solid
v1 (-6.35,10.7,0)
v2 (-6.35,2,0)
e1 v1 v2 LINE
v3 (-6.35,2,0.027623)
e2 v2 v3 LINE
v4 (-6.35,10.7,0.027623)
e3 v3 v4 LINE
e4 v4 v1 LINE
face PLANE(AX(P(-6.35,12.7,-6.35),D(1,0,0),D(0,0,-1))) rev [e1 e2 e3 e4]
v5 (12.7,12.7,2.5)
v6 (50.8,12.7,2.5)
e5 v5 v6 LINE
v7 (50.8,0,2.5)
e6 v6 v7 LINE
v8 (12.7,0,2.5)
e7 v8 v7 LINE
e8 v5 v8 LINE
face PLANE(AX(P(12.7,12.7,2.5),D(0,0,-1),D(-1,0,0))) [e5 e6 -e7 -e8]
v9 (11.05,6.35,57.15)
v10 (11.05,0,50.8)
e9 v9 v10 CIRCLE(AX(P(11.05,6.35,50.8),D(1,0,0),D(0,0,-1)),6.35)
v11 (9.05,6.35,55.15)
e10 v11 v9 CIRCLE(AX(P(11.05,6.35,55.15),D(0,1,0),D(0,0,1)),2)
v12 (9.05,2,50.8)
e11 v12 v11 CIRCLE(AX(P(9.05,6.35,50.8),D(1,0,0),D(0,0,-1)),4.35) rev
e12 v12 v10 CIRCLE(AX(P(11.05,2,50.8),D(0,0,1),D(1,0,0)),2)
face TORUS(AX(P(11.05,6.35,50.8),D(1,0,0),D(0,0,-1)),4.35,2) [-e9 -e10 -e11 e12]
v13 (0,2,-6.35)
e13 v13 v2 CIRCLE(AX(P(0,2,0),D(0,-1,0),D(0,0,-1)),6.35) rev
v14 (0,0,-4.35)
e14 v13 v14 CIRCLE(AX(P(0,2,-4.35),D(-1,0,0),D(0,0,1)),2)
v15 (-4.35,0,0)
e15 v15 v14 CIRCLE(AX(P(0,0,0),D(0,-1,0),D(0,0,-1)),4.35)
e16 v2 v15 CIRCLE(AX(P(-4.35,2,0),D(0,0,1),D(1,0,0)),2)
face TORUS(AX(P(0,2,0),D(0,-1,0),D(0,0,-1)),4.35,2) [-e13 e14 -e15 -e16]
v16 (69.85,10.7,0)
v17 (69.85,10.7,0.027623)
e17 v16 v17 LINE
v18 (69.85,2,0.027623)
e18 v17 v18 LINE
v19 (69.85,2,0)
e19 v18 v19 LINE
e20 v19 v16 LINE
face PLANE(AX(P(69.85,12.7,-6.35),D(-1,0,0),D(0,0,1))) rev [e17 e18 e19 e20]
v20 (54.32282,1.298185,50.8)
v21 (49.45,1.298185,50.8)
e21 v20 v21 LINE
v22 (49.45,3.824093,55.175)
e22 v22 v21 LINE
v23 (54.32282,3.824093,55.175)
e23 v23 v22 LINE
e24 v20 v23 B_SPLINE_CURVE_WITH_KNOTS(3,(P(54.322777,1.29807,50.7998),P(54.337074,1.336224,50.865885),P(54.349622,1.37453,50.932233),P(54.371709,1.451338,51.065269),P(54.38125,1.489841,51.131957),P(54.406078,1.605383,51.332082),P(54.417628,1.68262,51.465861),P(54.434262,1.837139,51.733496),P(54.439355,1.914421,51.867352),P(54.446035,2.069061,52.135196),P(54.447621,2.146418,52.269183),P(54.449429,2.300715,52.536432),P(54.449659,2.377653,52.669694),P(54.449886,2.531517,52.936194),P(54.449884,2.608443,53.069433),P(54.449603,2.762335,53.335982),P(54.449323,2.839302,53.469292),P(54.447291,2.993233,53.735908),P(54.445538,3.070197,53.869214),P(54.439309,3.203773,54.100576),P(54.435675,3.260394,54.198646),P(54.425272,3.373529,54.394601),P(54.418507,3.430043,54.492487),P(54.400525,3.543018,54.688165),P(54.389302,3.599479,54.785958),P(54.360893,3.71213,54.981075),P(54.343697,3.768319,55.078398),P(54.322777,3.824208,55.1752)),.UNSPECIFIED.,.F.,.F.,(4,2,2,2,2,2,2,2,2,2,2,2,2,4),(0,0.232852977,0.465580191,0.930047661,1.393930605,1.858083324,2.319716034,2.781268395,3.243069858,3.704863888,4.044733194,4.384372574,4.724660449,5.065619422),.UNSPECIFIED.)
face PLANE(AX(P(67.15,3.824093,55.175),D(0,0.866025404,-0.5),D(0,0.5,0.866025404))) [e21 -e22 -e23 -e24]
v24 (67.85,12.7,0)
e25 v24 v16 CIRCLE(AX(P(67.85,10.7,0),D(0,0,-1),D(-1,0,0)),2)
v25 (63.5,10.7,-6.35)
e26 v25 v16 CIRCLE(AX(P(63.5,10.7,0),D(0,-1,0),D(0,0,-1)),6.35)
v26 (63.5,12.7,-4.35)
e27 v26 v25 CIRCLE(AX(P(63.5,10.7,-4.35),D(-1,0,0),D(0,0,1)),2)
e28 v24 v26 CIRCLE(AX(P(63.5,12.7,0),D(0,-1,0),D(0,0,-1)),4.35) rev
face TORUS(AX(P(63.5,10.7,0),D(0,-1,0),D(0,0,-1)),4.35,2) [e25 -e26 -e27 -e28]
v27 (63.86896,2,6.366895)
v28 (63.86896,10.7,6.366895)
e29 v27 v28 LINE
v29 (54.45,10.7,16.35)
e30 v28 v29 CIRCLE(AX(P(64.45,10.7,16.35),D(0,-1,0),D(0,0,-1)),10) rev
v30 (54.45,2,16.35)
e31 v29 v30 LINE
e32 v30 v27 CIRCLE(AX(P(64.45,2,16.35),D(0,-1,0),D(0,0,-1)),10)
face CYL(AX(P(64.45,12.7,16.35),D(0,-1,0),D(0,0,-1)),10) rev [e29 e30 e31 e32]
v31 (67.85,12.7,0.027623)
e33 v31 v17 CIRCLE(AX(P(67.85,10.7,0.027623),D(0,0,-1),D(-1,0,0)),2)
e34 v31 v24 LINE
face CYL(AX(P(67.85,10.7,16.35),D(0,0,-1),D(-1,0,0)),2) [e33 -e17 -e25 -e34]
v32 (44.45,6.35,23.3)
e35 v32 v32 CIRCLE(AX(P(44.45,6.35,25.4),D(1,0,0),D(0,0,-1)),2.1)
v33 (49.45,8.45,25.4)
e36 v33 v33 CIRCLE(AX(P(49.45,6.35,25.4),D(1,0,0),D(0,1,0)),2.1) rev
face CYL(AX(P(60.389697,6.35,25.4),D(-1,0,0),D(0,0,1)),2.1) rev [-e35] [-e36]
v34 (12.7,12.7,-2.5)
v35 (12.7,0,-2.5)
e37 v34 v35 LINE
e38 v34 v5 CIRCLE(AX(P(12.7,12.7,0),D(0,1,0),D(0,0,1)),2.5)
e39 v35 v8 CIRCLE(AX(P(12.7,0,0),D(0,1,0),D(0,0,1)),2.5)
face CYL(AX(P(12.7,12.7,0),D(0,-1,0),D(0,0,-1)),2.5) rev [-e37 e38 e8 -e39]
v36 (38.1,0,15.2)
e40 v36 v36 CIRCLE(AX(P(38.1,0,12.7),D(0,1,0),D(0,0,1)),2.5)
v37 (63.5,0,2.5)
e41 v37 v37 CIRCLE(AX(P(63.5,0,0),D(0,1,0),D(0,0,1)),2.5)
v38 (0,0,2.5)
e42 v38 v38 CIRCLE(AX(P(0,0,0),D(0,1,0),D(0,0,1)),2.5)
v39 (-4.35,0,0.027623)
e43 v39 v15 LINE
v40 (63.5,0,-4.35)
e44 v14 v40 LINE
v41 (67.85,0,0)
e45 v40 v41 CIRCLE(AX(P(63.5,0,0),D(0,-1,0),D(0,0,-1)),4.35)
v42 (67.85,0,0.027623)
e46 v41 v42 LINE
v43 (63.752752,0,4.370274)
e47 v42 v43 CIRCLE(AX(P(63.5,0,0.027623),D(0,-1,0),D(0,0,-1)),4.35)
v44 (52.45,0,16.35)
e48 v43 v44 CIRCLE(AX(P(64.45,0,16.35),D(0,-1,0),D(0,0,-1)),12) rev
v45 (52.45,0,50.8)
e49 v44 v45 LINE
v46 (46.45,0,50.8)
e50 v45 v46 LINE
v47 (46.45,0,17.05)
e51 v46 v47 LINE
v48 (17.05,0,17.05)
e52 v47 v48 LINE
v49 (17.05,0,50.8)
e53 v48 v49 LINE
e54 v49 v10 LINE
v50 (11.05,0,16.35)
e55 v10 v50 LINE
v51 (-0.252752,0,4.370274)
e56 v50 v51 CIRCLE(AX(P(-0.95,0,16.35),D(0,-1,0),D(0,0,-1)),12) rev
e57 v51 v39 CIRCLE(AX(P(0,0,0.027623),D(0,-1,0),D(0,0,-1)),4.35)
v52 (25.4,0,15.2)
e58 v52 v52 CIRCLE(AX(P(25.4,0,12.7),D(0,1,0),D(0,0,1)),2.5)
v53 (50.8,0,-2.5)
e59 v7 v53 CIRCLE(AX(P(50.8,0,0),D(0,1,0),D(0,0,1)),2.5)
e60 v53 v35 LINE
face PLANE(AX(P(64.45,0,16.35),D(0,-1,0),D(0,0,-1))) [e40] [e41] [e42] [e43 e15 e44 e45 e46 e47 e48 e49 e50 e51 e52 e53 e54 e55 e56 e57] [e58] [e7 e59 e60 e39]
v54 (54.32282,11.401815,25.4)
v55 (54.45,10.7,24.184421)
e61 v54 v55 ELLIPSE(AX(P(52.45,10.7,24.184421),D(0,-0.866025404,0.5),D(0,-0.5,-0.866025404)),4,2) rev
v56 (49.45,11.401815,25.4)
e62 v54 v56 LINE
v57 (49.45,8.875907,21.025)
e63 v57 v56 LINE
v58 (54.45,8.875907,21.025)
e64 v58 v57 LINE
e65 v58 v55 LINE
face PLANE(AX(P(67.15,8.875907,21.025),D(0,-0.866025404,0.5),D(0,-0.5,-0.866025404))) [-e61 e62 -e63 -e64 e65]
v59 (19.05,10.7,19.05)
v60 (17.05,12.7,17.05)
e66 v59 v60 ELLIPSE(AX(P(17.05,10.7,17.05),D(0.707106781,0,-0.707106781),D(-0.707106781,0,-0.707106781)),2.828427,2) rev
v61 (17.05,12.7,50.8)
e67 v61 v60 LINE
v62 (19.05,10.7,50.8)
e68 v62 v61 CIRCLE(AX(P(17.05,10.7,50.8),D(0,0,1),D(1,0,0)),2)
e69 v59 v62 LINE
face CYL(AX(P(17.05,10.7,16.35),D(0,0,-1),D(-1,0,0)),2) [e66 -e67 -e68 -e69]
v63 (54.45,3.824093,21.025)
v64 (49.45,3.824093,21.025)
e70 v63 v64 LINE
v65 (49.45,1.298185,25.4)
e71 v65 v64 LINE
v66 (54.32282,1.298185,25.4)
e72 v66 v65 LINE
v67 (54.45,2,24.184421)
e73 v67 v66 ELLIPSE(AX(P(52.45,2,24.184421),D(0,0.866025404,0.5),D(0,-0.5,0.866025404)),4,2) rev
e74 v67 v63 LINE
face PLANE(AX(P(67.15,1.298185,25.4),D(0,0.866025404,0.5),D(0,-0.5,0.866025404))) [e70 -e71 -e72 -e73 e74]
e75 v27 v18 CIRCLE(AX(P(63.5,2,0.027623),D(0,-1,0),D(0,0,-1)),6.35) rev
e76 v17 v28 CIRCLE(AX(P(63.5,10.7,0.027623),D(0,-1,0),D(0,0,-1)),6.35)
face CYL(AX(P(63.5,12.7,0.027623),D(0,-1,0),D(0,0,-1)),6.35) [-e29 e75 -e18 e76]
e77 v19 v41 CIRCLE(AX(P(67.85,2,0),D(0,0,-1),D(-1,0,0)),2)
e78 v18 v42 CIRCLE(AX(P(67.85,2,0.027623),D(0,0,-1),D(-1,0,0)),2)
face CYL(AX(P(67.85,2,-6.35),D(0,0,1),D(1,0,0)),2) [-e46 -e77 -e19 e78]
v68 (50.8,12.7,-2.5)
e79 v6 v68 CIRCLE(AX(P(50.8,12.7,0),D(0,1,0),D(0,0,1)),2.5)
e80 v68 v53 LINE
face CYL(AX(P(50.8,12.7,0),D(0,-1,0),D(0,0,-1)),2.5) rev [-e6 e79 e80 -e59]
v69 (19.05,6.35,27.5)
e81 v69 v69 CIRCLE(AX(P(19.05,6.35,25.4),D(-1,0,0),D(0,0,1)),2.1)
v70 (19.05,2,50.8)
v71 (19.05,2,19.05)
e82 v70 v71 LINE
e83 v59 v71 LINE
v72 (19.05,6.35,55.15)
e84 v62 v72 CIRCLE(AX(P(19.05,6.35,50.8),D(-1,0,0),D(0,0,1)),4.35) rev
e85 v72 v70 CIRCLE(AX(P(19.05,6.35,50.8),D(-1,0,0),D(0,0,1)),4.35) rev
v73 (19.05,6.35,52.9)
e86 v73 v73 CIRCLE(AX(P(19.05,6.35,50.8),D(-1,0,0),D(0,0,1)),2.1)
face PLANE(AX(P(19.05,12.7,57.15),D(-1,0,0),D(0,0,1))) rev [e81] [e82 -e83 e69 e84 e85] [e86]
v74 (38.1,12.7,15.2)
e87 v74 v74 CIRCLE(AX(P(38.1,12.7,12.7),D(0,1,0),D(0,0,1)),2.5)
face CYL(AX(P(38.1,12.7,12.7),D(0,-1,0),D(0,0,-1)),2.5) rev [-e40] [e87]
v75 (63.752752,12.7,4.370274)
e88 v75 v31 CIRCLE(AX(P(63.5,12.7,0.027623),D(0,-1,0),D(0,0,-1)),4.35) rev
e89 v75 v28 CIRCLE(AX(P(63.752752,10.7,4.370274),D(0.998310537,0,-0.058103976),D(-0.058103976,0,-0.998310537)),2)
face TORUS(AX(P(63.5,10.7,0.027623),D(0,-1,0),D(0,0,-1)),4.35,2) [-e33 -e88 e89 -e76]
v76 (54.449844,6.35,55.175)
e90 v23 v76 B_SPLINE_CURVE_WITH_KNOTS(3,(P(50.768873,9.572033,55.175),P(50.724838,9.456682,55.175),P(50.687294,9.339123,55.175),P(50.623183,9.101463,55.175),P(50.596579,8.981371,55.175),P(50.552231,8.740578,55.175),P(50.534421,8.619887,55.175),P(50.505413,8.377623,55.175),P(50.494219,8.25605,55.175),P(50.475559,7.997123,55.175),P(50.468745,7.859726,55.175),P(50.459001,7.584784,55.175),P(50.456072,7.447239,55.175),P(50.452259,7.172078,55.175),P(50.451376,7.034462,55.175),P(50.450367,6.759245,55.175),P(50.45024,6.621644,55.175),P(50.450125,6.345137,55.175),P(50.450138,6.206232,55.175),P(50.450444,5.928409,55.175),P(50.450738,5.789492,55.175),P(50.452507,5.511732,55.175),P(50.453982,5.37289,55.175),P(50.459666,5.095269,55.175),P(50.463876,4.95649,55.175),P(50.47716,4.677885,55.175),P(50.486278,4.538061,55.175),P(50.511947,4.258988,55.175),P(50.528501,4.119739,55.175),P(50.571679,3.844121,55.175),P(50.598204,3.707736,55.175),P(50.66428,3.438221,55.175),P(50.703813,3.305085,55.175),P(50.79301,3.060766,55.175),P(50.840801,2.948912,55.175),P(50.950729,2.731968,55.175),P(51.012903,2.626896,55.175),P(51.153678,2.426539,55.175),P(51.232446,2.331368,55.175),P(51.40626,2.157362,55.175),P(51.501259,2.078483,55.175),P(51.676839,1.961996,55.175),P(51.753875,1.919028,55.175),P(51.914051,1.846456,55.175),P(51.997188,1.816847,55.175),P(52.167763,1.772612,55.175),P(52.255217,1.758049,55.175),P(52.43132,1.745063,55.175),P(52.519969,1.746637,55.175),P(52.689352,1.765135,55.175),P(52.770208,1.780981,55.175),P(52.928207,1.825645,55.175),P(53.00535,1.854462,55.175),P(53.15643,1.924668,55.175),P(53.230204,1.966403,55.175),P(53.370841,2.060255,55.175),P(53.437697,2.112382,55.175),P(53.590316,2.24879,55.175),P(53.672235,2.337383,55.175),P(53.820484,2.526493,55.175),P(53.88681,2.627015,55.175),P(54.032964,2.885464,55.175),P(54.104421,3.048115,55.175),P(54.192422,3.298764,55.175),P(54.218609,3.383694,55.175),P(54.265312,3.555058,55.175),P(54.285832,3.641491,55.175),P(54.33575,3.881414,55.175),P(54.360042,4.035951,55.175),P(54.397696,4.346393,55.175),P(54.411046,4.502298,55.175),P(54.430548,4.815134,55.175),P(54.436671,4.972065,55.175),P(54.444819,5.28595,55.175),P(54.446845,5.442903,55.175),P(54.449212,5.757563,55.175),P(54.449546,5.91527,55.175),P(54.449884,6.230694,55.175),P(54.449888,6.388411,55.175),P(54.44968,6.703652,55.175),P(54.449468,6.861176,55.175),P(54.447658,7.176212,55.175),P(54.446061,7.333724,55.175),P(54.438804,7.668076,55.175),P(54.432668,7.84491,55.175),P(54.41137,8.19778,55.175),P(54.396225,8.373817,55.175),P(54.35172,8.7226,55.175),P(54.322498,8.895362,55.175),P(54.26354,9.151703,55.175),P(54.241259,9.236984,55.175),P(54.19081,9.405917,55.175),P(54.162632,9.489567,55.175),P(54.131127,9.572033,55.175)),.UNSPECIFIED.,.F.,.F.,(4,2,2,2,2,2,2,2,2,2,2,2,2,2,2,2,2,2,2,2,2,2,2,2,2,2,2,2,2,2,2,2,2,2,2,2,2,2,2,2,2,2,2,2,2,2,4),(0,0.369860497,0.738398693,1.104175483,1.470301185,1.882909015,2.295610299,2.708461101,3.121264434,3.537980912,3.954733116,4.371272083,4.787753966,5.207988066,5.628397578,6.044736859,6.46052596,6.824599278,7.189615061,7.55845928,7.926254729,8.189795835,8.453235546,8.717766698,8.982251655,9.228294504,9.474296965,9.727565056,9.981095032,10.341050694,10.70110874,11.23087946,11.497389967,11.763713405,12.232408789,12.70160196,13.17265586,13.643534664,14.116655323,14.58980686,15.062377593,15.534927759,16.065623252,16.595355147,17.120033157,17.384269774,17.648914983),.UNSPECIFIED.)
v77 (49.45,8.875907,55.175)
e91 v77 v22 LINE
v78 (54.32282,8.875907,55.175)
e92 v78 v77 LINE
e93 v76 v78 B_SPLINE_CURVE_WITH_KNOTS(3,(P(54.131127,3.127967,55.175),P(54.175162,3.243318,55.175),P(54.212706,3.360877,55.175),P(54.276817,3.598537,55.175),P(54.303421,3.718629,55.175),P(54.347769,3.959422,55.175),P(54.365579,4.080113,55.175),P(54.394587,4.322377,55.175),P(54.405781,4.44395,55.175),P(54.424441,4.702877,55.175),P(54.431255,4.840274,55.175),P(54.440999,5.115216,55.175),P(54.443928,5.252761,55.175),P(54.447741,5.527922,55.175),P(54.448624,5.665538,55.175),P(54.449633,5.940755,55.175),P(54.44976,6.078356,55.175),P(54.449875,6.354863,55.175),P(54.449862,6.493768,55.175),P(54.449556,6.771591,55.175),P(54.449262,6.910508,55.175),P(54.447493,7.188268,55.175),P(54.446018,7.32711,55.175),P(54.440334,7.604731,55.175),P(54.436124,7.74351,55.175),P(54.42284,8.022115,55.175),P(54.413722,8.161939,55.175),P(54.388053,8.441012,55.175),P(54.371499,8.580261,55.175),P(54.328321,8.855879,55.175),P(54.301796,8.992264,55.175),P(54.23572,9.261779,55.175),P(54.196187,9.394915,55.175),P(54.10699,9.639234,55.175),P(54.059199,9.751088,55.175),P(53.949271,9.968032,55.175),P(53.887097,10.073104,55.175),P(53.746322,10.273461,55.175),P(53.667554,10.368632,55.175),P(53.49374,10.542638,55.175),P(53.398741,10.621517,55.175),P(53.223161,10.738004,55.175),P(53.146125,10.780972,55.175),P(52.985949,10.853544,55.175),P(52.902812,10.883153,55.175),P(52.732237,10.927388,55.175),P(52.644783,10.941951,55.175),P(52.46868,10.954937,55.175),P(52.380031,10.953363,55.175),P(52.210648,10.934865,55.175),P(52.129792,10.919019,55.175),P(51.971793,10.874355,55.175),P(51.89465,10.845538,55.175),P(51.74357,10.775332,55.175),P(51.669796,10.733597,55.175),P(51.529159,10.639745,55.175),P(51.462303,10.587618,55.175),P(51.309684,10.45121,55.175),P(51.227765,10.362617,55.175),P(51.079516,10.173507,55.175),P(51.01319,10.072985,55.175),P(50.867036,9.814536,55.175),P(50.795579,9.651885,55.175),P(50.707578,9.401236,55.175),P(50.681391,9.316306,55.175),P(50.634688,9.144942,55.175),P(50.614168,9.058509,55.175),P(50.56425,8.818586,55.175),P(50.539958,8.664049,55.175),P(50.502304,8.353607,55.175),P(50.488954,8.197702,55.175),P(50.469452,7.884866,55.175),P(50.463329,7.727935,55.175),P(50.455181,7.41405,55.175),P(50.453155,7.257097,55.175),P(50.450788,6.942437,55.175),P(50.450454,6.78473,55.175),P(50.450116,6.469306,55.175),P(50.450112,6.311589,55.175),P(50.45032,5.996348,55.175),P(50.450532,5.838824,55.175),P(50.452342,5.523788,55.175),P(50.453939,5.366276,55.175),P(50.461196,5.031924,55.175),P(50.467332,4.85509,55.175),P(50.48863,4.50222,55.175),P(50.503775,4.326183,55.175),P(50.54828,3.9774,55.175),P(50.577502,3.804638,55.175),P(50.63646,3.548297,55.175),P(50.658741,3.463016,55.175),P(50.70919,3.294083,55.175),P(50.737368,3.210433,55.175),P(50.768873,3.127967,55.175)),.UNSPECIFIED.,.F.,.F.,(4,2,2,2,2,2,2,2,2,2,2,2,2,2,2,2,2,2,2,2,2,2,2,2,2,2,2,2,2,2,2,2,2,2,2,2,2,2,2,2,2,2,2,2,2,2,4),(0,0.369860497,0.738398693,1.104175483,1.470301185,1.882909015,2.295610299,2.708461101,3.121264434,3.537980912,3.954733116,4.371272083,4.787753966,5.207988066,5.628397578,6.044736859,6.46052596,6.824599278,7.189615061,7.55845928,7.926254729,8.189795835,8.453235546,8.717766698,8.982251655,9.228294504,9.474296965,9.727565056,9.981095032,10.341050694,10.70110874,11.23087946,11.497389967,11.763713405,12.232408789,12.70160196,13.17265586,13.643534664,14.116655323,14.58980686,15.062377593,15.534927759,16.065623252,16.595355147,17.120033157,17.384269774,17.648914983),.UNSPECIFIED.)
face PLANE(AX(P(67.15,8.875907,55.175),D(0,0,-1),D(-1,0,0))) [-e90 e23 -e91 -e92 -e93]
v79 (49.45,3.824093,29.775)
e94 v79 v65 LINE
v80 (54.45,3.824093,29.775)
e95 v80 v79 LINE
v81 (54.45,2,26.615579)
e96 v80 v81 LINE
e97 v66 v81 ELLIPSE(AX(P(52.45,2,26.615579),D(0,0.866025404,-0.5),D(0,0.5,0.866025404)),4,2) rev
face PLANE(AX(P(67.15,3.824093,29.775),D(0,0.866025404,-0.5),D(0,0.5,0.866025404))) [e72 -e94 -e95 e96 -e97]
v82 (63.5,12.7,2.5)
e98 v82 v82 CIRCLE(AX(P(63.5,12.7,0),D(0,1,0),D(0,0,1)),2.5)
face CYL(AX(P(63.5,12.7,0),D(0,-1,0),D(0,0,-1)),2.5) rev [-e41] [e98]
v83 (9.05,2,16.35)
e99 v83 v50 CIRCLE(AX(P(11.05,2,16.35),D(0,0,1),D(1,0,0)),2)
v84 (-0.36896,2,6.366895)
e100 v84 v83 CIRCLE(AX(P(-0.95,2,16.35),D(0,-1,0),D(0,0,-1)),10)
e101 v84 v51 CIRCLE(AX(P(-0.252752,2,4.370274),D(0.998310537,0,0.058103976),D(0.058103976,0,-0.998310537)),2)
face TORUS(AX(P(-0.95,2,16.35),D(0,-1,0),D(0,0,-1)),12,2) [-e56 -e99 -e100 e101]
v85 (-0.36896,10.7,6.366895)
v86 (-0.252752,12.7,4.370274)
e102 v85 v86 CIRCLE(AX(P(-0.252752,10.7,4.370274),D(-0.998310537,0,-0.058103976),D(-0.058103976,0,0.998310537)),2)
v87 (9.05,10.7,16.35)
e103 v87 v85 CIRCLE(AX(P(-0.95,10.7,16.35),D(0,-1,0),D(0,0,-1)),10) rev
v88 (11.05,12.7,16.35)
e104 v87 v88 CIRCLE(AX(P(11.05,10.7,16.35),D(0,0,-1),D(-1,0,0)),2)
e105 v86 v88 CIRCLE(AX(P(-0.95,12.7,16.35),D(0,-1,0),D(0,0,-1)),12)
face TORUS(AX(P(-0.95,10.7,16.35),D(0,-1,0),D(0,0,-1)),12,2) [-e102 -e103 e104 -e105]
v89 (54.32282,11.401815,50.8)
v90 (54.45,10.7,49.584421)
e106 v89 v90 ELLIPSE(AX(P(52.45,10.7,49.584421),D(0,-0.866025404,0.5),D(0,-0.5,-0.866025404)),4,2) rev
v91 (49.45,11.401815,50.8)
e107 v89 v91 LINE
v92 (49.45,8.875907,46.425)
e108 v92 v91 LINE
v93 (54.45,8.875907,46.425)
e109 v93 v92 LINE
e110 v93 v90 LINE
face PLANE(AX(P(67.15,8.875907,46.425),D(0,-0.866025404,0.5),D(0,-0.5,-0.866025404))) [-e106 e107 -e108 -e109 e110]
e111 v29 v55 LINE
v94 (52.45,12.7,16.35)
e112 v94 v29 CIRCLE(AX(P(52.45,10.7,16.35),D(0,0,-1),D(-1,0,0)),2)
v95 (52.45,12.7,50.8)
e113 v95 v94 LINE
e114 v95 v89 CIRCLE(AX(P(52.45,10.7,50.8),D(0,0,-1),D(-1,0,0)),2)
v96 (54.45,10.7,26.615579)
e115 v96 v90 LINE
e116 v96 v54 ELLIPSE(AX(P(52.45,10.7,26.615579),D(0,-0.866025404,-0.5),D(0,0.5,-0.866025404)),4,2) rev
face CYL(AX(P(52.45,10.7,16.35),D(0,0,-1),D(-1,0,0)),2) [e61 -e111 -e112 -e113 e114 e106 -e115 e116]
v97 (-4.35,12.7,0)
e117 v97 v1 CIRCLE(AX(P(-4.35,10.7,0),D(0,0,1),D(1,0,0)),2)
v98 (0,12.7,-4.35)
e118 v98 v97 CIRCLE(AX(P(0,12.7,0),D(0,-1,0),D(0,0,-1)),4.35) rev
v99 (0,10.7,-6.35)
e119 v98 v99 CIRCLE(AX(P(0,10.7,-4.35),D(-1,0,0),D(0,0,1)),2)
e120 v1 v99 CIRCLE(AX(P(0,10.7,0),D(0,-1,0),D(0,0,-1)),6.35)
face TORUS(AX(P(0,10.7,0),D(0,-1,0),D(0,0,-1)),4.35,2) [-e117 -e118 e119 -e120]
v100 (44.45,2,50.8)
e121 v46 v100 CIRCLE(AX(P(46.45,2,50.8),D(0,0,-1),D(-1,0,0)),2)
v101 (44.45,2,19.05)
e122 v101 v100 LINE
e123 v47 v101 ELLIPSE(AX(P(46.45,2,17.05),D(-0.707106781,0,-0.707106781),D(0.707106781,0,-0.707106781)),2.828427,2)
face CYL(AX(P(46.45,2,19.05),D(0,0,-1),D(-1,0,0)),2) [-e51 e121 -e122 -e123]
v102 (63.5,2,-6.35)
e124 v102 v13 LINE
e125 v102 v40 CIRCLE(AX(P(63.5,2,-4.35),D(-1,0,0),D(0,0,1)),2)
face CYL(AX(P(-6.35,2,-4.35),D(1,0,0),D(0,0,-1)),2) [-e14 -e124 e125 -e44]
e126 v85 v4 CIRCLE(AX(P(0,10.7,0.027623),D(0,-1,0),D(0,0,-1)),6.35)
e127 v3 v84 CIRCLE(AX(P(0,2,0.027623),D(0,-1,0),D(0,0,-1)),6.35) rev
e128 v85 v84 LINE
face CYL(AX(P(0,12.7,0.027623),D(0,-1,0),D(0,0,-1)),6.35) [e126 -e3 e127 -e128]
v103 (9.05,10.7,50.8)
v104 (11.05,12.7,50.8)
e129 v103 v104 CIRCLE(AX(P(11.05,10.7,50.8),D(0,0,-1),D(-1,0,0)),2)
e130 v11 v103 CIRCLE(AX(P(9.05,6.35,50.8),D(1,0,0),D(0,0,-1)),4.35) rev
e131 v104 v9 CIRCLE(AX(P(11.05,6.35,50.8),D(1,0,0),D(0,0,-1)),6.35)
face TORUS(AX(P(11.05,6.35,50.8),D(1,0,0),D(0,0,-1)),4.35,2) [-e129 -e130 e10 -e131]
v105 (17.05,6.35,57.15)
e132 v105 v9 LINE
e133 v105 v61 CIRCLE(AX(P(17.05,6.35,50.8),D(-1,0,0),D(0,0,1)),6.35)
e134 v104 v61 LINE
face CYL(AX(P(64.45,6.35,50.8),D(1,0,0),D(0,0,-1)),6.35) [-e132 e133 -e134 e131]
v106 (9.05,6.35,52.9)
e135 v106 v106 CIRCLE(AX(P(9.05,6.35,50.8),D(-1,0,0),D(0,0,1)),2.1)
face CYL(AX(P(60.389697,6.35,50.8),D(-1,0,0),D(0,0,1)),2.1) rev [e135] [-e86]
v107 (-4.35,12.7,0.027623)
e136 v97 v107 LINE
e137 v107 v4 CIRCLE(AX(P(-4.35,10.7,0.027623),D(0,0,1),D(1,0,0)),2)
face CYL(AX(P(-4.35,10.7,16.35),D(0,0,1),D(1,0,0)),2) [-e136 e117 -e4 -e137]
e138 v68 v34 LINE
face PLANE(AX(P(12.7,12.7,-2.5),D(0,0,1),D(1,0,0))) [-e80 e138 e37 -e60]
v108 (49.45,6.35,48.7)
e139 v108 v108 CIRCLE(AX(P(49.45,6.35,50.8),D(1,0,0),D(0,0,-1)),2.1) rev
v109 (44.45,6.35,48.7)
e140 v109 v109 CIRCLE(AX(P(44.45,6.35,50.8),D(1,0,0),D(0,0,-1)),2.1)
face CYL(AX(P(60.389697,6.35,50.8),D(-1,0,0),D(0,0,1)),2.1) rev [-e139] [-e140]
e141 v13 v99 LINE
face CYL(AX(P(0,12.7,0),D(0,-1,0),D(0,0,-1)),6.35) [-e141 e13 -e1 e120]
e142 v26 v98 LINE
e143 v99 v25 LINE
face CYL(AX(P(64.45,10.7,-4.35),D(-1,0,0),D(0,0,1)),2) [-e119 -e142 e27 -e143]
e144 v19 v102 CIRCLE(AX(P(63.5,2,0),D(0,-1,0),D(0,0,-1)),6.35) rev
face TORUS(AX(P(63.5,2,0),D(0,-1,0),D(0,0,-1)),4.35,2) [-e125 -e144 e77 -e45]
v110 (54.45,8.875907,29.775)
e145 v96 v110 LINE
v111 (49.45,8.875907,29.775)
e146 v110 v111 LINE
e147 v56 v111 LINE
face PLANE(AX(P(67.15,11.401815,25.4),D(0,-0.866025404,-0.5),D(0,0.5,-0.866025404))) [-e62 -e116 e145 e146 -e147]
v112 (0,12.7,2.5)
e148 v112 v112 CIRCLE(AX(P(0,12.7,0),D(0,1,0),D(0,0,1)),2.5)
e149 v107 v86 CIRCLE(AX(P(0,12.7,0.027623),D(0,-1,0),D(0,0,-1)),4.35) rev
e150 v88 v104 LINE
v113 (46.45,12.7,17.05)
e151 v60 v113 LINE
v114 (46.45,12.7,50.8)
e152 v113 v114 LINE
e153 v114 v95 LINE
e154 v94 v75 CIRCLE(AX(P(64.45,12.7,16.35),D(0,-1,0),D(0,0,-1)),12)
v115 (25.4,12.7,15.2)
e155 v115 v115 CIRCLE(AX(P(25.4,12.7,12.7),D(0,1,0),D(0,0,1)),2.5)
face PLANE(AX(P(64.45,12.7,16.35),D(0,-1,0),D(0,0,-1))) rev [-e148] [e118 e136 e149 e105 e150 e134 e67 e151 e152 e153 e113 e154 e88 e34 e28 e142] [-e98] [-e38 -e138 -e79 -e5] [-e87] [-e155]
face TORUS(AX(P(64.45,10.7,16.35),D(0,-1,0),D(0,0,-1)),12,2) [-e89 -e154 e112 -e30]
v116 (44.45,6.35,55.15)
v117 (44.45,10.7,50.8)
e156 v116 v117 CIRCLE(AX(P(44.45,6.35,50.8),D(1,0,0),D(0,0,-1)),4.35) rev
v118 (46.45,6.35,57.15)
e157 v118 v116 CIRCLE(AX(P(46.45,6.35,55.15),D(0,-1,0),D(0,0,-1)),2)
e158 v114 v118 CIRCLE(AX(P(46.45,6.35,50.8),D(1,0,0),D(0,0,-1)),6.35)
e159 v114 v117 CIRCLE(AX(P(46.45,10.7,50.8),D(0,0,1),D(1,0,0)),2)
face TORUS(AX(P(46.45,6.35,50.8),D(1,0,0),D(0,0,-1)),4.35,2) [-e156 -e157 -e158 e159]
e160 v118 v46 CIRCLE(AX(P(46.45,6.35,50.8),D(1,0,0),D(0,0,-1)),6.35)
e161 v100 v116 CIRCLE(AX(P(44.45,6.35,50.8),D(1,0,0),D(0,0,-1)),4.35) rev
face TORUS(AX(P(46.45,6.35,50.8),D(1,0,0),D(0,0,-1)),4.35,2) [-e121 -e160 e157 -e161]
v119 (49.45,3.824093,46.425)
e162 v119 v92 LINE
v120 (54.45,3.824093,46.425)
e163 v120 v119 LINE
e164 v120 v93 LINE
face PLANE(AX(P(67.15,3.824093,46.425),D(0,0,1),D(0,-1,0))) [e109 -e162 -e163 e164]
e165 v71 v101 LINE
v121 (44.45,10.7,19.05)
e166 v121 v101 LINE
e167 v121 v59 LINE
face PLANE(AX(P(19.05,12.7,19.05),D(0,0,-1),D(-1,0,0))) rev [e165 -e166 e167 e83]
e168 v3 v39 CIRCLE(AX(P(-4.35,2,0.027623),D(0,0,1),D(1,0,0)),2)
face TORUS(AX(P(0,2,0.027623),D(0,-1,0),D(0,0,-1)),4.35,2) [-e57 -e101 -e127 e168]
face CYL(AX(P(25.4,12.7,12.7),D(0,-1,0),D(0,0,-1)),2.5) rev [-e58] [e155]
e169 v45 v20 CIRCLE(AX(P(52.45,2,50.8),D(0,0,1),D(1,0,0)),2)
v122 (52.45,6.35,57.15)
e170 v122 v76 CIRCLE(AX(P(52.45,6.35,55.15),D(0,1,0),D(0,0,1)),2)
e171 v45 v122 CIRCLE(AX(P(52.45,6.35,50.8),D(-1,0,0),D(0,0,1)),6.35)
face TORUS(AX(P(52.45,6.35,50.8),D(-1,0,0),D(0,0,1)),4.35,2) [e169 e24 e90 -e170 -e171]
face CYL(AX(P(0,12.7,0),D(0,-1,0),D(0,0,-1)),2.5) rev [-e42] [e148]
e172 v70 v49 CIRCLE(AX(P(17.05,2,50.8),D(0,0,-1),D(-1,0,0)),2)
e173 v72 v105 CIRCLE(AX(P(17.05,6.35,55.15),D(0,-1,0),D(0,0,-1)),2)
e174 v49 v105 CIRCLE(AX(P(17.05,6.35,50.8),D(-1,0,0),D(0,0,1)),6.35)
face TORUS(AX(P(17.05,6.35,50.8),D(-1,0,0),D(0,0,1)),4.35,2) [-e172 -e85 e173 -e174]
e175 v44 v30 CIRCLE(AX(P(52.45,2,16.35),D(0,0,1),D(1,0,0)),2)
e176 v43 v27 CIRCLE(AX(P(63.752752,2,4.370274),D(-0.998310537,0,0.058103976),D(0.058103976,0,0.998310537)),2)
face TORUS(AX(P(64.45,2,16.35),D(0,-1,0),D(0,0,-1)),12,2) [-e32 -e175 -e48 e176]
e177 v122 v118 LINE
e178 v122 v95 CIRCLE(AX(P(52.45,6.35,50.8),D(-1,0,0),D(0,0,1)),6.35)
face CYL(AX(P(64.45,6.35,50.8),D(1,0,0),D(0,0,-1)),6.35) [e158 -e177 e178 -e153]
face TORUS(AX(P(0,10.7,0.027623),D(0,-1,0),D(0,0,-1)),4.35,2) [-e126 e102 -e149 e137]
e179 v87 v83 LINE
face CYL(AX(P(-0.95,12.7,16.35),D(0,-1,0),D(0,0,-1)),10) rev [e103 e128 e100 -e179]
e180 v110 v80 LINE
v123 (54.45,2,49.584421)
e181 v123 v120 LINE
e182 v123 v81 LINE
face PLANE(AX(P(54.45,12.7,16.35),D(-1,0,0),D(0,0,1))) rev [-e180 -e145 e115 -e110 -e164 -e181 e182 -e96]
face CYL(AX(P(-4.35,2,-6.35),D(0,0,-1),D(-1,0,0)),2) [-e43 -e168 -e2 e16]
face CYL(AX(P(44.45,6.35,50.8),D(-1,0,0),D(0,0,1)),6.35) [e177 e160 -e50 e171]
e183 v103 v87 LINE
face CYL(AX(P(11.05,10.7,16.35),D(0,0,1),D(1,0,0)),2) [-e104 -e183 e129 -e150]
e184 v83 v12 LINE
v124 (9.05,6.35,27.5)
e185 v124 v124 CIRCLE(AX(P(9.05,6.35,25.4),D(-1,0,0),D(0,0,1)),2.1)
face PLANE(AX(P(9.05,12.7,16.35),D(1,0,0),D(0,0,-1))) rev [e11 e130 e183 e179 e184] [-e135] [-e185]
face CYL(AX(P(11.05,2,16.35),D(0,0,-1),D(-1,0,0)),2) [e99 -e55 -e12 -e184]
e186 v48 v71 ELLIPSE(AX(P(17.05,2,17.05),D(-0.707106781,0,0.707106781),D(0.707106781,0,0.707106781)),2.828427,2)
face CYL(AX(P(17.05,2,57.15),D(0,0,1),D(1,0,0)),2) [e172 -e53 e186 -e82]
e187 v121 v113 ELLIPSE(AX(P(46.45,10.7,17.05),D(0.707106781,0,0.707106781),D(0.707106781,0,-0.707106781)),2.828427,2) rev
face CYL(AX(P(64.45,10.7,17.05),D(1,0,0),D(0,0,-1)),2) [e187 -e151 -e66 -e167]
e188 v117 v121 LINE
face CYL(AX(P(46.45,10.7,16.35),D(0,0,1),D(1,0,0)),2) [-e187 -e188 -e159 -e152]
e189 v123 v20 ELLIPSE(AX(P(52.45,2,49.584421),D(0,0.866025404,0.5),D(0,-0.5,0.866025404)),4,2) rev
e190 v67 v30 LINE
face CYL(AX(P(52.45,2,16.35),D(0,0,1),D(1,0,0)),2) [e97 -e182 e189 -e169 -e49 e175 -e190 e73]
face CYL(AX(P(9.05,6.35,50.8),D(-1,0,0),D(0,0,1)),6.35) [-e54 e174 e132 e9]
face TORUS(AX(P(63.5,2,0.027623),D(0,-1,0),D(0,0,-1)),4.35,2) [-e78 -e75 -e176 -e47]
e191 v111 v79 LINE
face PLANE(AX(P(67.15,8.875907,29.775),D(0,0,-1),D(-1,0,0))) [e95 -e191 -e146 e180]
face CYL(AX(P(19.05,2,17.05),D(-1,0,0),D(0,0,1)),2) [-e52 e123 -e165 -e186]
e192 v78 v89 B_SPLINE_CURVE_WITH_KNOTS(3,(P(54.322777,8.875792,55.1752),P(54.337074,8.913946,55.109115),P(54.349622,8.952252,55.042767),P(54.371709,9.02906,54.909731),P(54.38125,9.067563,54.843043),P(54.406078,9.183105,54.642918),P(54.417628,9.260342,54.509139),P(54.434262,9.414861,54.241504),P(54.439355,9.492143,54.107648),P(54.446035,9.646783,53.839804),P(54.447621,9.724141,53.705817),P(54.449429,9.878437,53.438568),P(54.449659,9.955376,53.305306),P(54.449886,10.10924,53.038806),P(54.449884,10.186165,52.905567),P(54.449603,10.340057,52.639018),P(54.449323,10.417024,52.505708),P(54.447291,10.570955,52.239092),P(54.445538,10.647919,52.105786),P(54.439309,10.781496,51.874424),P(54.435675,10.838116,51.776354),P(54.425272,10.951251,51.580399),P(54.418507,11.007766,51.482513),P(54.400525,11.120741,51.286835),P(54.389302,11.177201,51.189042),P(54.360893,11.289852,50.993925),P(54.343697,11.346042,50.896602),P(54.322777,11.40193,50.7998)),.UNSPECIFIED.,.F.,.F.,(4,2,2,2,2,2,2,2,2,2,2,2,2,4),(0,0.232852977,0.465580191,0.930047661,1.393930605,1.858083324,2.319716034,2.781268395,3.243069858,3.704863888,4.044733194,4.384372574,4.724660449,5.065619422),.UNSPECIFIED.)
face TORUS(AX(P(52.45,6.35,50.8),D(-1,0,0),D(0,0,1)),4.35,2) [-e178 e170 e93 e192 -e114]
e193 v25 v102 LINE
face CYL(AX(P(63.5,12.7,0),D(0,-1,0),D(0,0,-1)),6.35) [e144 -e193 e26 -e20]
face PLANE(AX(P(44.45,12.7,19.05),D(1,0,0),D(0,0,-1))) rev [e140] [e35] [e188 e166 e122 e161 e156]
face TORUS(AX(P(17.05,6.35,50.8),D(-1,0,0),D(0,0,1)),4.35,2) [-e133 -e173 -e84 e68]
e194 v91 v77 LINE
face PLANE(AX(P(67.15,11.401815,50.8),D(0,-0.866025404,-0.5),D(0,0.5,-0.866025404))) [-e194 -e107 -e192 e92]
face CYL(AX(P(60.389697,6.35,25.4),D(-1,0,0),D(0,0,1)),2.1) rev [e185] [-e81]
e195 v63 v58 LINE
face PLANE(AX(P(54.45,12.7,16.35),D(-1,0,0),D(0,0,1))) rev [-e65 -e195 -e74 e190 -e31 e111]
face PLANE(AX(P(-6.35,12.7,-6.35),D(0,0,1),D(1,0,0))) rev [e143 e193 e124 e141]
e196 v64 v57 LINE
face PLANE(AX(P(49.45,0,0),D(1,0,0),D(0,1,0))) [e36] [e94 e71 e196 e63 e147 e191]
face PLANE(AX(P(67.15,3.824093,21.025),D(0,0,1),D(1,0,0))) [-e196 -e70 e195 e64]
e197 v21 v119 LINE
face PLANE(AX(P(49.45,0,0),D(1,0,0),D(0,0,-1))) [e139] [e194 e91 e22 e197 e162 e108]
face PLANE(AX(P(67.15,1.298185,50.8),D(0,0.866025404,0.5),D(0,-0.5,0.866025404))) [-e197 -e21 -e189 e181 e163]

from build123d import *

# Parameters (mm, degrees)
SKETCH1_R               = 2.5
BOSS_EXTRUDE2_DEPTH     = 12.7
FILLET1_R               = 6.35
FILLET2_R               = 6.35
FILLET3_R               = 2
CUT_EXTRUDE1_REACH      = 86.404
SKETCH2_R               = 2.1
CUT_EXTRUDE4_DEPTH      = 12.7
CUT_EXTRUDE4_DEPTH_BACK = 5
FILLET4_R               = 2


with BuildPart() as part:
    # Sketch1 → Boss-Extrude2 (new body)
    with BuildSketch(Plane(origin=(0, 0, 0), x_dir=(1, 0, 0), z_dir=(0, 1, 0))):
        with BuildLine():
            Line((-6.35, 6.35), (69.85, 6.35))
            Line((69.85, 6.35), (69.85, -6.35))
            Line((69.85, -6.35), (64.45, -6.35))
            ThreePointArc((64.45, -6.35), (57.378932188, -9.278932188), (54.45, -16.35))
            Line((54.45, -16.35), (54.45, -57.15))
            Line((54.45, -57.15), (44.45, -57.15))
            Line((44.45, -57.15), (44.45, -19.05))
            Line((44.45, -19.05), (19.05, -19.05))
            Line((19.05, -19.05), (19.05, -57.15))
            Line((19.05, -57.15), (9.05, -57.15))
            Line((9.05, -57.15), (9.05, -16.35))
            ThreePointArc((9.05, -16.35), (6.121067812, -9.278932188), (-0.95, -6.35))
            Line((-0.95, -6.35), (-6.35, -6.35))
            Line((-6.35, -6.35), (-6.35, 6.35))
        make_face()
        with Locations(Location((0, 0, 0), (0, 0, 270))):
            Circle(SKETCH1_R, mode=Mode.SUBTRACT)
        with Locations(Location((63.5, 0, 0), (0, 0, 270))):
            Circle(SKETCH1_R, mode=Mode.SUBTRACT)
        with Locations(Location((38.1, -12.7, 0), (0, 0, 270))):
            Circle(SKETCH1_R, mode=Mode.SUBTRACT)
        with Locations(Location((25.4, -12.7, 0), (0, 0, 270))):
            Circle(SKETCH1_R, mode=Mode.SUBTRACT)
        with BuildLine():
            Line((12.7, 2.5), (50.8, 2.5))
            ThreePointArc((50.8, 2.5), (53.3, 0), (50.8, -2.5))
            Line((50.8, -2.5), (12.7, -2.5))
            ThreePointArc((12.7, -2.5), (10.2, 0), (12.7, 2.5))
        make_face(mode=Mode.SUBTRACT)
    extrude(amount=BOSS_EXTRUDE2_DEPTH)

    # Fillet1
    fillet1_edges = [part.edges().sort_by_distance(p)[0] for p in [
        (49.45, 0, 57.15),
        (49.45, 12.7, 57.15),
        (14.05, 0, 57.15),
        (14.05, 12.7, 57.15),
    ]]
    fillet(fillet1_edges, radius=FILLET1_R - 0.0001)  # a hair under: the kernel refuses the full size

    # Fillet2
    fillet2_edges = [part.edges().sort_by_distance(p)[0] for p in [
        (69.85, 6.35, 6.35),
        (69.85, 6.35, -6.35),
        (-6.35, 6.35, -6.35),
        (-6.35, 6.35, 6.35),
    ]]
    fillet(fillet2_edges, radius=FILLET2_R)

    # Fillet3
    fillet3_edges = [part.edges().sort_by_distance(p)[0] for p in [
        (9.05, 0, 33.57505),
        (57.176404, 0, 9.487434793),
        (9.05, 12.7, 33.57505),
        (57.176404, 12.7, 9.487434793),
        (54.45, 0, 33.57505),
        (54.45, 12.7, 33.57505),
        (54.45, 10.84015735, 55.29015735),
        (54.45, 1.85984265, 55.29015735),
        (9.05, 10.84015735, 55.29015735),
        (9.05, 1.85984265, 55.29015735),
        (69.85, 0, 0.013811361),
        (69.85, 12.7, 0.013811361),
        (6.323596, 0, 9.487434793),
        (-6.35, 0, 0.013811361),
        (31.75, 0, -6.35),
        (-4.61873346, 0, 4.385351629),
        (-4.490128061, 0, -4.490128061),
        (67.990128061, 0, -4.490128061),
        (68.11873346, 0, 4.385351629),
        (31.75, 12.7, -6.35),
        (-6.35, 12.7, 0.013811361),
        (6.323596, 12.7, 9.487434793),
        (-4.61873346, 12.7, 4.385351629),
        (-4.490128061, 12.7, -4.490128061),
        (67.990128061, 12.7, -4.490128061),
        (68.11873346, 12.7, 4.385351629),
    ]]
    fillet(fillet3_edges, radius=FILLET3_R)

    # Cut-Extrude1: up to this face of the body (flat: up to its plane)
    cut_extrude1_end = Plane(part.part.faces().sort_by_distance((54.45, 6.35, 35.29570889))[0])
    # Sketch2 → Cut-Extrude1 (cut, up to the picked face)
    with BuildSketch(Plane.ZY.offset(-9.05), mode=Mode.PRIVATE) as cut_extrude1_sk1:
        with Locations((50.8, 6.35)):
            Circle(SKETCH2_R)
    cut_extrude1_tool1 = split(extrude(cut_extrude1_sk1.sketch, amount=-CUT_EXTRUDE1_REACH, mode=Mode.PRIVATE), bisect_by=cut_extrude1_end, keep=Keep.BOTH, mode=Mode.PRIVATE)
    # Sketch2 → Cut-Extrude1 (cut, up to the picked face)
    with BuildSketch(Plane.ZY.offset(-9.05), mode=Mode.PRIVATE) as cut_extrude1_sk2:
        with Locations((25.4, 6.35)):
            Circle(SKETCH2_R)
    cut_extrude1_tool2 = split(extrude(cut_extrude1_sk2.sketch, amount=-CUT_EXTRUDE1_REACH, mode=Mode.PRIVATE), bisect_by=cut_extrude1_end, keep=Keep.BOTH, mode=Mode.PRIVATE)
    add(cut_extrude1_tool1.solids().sort_by(Axis((9.05, 6.35, 50.8), (1, 0, 0)))[0], mode=Mode.SUBTRACT)
    add(cut_extrude1_tool2.solids().sort_by(Axis((9.05, 6.35, 25.4), (1, 0, 0)))[0], mode=Mode.SUBTRACT)

    # Sketch3 → Cut-Extrude4 (cut, two sides: drawn at the far end of the back side and taken through both)
    with BuildSketch(Plane(origin=(54.45, 0, 0), x_dir=(0, 0, -1), z_dir=(1, 0, 0)).offset(-CUT_EXTRUDE4_DEPTH_BACK)):
        Polygon((-25.4, 1.298185145), (-21.025, 3.824092572), (-21.025, 8.875907428), (-25.4, 11.401814855), (-29.775, 8.875907428), (-29.775, 3.824092572), align=None)
        Polygon((-50.8, 1.298185145), (-46.425, 3.824092572), (-46.425, 8.875907428), (-50.8, 11.401814855), (-55.175, 8.875907428), (-55.175, 3.824092572), align=None)
    extrude(amount=CUT_EXTRUDE4_DEPTH + CUT_EXTRUDE4_DEPTH_BACK, mode=Mode.SUBTRACT)

    # Fillet4
    fillet4_edges = [part.edges().sort_by_distance(p)[0] for p in [
        (44.45, 0, 34.92505),
        (31.75, 0, 19.05),
        (31.75, 12.7, 19.05),
        (44.45, 12.7, 34.92505),
        (19.05, 0, 34.92505),
        (44.45, 10.84015735, 55.29015735),
        (44.45, 1.85984265, 55.29015735),
        (19.05, 12.7, 34.92505),
        (19.05, 10.84015735, 55.29015735),
        (19.05, 1.85984265, 55.29015735),
    ]]
    fillet(fillet4_edges, radius=FILLET4_R)


solid = part.part
